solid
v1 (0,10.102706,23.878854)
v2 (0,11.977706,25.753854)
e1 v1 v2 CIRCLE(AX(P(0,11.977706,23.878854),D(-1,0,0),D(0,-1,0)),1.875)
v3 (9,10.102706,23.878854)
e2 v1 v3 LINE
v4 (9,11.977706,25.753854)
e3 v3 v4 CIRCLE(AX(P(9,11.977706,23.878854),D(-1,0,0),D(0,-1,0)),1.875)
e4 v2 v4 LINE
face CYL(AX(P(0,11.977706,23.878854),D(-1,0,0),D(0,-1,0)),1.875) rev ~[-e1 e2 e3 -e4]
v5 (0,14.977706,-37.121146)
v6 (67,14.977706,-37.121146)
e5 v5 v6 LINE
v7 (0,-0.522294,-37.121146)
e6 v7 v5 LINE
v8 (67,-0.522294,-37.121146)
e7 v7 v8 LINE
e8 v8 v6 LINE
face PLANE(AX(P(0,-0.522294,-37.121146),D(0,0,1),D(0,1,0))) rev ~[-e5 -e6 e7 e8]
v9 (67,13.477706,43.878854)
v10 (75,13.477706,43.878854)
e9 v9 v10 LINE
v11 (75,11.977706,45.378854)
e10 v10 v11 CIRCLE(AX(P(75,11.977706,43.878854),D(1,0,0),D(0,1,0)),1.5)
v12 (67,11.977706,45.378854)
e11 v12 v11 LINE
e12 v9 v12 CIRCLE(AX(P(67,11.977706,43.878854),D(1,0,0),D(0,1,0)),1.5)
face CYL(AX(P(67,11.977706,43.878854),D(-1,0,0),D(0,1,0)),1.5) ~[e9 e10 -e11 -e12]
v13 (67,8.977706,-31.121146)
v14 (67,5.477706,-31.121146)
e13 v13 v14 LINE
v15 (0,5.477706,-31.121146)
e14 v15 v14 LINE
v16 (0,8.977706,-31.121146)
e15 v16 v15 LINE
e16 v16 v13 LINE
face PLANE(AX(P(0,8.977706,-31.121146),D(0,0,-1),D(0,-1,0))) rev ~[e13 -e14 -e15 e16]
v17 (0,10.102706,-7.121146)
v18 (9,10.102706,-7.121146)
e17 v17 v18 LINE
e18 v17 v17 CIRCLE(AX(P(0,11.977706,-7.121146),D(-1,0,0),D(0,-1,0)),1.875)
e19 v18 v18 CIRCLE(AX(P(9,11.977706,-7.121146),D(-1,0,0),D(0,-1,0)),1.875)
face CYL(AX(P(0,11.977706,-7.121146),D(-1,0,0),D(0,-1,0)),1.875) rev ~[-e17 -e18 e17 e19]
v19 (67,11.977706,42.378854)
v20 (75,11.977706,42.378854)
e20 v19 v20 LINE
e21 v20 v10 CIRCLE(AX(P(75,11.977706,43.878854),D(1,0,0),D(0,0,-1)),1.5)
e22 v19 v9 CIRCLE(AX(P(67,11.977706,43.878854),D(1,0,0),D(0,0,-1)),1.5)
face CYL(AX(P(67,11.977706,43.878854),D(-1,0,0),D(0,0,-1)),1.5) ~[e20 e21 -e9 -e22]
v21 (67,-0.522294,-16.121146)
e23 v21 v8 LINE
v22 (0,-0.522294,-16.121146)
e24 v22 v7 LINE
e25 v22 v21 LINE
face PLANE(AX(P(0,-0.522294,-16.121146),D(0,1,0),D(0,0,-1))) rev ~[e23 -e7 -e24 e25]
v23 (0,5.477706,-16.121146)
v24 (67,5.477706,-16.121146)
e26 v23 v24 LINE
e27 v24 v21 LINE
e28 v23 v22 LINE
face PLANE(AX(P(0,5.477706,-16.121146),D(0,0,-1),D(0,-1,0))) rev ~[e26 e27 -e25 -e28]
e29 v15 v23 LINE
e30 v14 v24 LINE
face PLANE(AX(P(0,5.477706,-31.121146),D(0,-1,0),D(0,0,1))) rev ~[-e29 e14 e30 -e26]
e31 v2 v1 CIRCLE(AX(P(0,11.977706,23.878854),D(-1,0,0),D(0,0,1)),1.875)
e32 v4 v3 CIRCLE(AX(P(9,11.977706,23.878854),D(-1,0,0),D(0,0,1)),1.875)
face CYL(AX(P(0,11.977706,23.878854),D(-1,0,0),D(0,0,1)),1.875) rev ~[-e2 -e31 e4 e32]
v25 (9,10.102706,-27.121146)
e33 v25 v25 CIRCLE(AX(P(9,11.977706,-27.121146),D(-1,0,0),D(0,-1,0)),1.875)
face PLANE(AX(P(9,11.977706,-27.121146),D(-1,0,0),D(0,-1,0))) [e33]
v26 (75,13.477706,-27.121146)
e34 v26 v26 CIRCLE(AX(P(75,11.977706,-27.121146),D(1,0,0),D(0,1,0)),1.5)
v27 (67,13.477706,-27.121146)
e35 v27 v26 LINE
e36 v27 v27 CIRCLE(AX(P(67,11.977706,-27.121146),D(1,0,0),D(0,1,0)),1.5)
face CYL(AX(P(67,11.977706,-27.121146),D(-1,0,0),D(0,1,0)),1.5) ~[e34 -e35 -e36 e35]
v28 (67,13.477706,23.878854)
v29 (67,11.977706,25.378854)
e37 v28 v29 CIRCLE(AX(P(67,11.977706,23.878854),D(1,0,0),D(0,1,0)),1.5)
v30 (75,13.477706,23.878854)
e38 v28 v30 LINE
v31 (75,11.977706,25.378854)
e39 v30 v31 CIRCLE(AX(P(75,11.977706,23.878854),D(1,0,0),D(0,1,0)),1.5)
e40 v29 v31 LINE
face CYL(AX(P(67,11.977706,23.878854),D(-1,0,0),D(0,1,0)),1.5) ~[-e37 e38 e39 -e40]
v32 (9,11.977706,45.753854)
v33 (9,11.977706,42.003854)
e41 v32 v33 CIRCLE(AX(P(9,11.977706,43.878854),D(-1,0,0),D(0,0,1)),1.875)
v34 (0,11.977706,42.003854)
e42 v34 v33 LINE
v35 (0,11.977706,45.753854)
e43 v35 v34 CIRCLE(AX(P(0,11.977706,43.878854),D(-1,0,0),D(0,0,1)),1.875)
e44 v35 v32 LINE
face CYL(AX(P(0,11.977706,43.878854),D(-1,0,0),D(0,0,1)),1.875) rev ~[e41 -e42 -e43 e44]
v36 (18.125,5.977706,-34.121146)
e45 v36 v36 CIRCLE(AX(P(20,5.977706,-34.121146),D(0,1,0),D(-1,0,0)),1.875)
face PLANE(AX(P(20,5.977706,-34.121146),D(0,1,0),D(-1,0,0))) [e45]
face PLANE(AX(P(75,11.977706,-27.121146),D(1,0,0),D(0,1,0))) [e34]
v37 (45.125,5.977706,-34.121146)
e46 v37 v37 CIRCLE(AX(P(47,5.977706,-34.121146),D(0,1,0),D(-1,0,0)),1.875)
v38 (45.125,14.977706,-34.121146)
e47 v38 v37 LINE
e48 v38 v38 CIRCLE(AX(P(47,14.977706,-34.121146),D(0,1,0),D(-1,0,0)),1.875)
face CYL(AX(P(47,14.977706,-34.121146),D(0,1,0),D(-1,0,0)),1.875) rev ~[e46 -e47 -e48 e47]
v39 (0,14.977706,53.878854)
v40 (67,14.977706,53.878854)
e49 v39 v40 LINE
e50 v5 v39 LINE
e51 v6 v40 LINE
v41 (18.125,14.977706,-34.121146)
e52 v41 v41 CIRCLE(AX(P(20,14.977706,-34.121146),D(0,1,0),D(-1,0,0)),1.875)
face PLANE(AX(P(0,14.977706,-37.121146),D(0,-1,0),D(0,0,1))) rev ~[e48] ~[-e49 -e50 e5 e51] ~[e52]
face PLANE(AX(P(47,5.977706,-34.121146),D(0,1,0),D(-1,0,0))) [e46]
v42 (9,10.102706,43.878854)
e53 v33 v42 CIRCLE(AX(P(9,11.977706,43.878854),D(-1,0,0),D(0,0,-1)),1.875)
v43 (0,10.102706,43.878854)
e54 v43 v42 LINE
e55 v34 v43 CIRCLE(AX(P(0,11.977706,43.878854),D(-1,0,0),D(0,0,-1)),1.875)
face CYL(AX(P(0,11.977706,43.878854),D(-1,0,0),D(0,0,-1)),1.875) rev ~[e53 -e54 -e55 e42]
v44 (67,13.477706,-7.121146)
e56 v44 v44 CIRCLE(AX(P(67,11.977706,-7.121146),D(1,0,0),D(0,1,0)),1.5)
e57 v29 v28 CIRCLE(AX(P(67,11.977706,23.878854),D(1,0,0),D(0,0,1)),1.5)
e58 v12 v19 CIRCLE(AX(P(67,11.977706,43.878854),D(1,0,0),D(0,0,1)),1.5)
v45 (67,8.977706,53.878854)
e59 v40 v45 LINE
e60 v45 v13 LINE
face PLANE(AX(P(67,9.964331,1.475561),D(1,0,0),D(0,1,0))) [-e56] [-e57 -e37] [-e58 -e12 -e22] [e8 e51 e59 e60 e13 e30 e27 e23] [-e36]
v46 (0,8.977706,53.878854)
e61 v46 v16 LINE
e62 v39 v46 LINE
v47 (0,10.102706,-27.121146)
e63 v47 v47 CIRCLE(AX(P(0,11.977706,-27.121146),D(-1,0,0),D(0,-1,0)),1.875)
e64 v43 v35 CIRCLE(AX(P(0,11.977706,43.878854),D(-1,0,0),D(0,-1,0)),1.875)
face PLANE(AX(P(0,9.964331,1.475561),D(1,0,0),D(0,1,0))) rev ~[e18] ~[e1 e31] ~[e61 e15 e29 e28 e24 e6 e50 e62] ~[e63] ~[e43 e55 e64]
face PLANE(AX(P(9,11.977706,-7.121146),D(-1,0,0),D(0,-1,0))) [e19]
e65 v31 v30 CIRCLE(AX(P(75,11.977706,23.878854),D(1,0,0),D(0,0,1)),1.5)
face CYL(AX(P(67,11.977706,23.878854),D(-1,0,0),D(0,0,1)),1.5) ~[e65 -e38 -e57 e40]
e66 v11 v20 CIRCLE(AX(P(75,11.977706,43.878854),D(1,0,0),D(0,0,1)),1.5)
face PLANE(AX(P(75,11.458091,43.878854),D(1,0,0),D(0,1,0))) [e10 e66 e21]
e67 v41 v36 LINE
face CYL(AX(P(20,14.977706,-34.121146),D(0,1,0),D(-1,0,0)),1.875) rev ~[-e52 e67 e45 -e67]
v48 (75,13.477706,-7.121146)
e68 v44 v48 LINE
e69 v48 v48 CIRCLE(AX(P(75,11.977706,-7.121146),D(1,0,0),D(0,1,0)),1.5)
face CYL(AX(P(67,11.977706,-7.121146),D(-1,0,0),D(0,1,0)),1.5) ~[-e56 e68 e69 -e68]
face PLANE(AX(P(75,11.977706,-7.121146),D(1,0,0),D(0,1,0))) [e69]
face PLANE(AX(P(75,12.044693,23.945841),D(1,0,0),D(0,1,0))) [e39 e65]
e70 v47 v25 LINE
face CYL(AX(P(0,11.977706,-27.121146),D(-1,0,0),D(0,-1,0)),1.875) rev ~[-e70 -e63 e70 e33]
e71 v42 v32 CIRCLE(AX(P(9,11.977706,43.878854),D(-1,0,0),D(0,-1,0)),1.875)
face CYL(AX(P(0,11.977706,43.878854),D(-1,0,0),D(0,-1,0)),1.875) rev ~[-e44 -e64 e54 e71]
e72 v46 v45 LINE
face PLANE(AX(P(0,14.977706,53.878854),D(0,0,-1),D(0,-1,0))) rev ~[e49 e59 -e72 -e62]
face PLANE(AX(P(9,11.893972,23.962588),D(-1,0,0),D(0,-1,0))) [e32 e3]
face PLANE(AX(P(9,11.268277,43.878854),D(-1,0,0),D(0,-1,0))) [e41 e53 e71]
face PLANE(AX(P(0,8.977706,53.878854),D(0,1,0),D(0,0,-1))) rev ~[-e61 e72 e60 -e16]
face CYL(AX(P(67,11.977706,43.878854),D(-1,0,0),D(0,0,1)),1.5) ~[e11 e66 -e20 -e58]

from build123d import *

# Parameters (mm, degrees)
F1_DEPTH = 67
F2_R     = 1.5
F3_DEPTH = 8
F4_R     = 1.875
F5_DEPTH = 9
F6_R     = 1.875
F7_DEPTH = 9
F8_R     = 1.875
F9_DEPTH = 9


# Not quite as in the source:
# - a feature names something its author has since deleted; it is built from what else it names


with BuildPart() as f1:
    # F0 (on Right) → F1 (new body)
    with BuildSketch(Plane.YZ):
        Polygon((14.9777059274, -37.1211464703), (14.9777059274, 53.8788535297), (8.9777059274, 53.8788535297), (8.9777059274, -31.1211464703), (5.4777059274, -31.1211464703), (5.4777059274, -16.1211464703), (-0.5222940726, -16.1211464703), (-0.5222940726, -37.1211464703), align=None)
    extrude(amount=F1_DEPTH)

    # F2 (on face) → F3 (join)
    with BuildSketch(Plane.YZ.offset(67)):
        with BuildLine():
            Line((11.9777059274, 43.8788535297), (11.9777059274, 45.3788535297))
            ThreePointArc((11.9777059274, 45.3788535297), (10.4777059274, 43.8788535297), (11.9777059274, 42.3788535297))
            Line((11.9777059274, 42.3788535297), (11.9777059274, 43.8788535297))
        make_face()
        with BuildLine():
            ThreePointArc((11.9777059274, 42.3788535297), (13.0383660992, 42.8181933579), (13.4777059274, 43.8788535297))
            ThreePointArc((13.4777059274, 43.8788535297), (13.0383660992, 44.9395137015), (11.9777059274, 45.3788535297))
            Line((11.9777059274, 45.3788535297), (11.9777059274, 43.8788535297))
            Line((11.9777059274, 43.8788535297), (11.9777059274, 42.3788535297))
        make_face()
        with BuildLine():
            ThreePointArc((13.4777059274, 23.8788535297), (13.0383660992, 24.9395137015), (11.9777059274, 25.3788535297))
            ThreePointArc((11.9777059274, 25.3788535297), (10.9170457557, 22.8181933579), (13.4777059274, 23.8788535297))
        make_face()
        with Locations((11.9777059274, -7.1211464703)):
            Circle(F2_R)
        with Locations((11.9777059274, -27.1211464703)):
            Circle(F2_R)
    extrude(amount=F3_DEPTH)

    # F4 (on face) → F5 (cut)
    with BuildSketch(Plane(origin=(0, 0, 0), x_dir=(0, -1, 0), z_dir=(-1, 0, 0))):
        with Locations((-18.4777059274, 23.8788535297)):
            Circle(F4_R)
        with Locations((-18.4777059274, 43.8788535297)):
            Circle(F4_R)
        with Locations((-18.4777059274, -7.1211464703)):
            Circle(F4_R)
        with Locations((-18.4777059274, -27.1211464703)):
            Circle(F4_R)
    extrude(amount=-F5_DEPTH, mode=Mode.SUBTRACT)

    # F6 (on face) → F7 (cut)
    with BuildSketch(Plane(origin=(0, 14.9777059274, 0), x_dir=(-1, 0, 0), z_dir=(0, 1, 0))):
        with Locations((-47, -34.1211464703)):
            Circle(F6_R)
        with Locations((-20, -34.1211464703)):
            Circle(F6_R)
    extrude(amount=-F7_DEPTH, mode=Mode.SUBTRACT)

    # F8 (on face) → F9 (cut)
    with BuildSketch(Plane(origin=(0, 0, 0), x_dir=(0, -1, 0), z_dir=(-1, 0, 0))):
        with BuildLine():
            ThreePointArc((-10.1027059274, 43.8788535297), (-10.6518807127, 45.2046787444), (-11.9777059274, 45.7538535297))
            Line((-11.9777059274, 45.7538535297), (-11.9777059274, 43.8788535297))
            Line((-11.9777059274, 43.8788535297), (-11.9777059274, 42.0038535297))
            ThreePointArc((-11.9777059274, 42.0038535297), (-10.6518807127, 42.553028315), (-10.1027059274, 43.8788535297))
        make_face()
        with BuildLine():
            ThreePointArc((-10.1027059274, 23.8788535297), (-10.6518807127, 25.2046787444), (-11.9777059274, 25.7538535297))
            ThreePointArc((-11.9777059274, 25.7538535297), (-13.3035311422, 22.553028315), (-10.1027059274, 23.8788535297))
        make_face()
        with BuildLine():
            Line((-11.9777059274, 43.8788535297), (-11.9777059274, 45.7538535297))
            ThreePointArc((-11.9777059274, 45.7538535297), (-13.8527059274, 43.8788535297), (-11.9777059274, 42.0038535297))
            Line((-11.9777059274, 42.0038535297), (-11.9777059274, 43.8788535297))
        make_face()
        with Locations((-11.9777059274, -27.1211464703)):
            Circle(F8_R)
        with Locations((-11.9777059274, -7.1211464703)):
            Circle(F8_R)
    extrude(amount=-F9_DEPTH, mode=Mode.SUBTRACT)


solid = f1.part
